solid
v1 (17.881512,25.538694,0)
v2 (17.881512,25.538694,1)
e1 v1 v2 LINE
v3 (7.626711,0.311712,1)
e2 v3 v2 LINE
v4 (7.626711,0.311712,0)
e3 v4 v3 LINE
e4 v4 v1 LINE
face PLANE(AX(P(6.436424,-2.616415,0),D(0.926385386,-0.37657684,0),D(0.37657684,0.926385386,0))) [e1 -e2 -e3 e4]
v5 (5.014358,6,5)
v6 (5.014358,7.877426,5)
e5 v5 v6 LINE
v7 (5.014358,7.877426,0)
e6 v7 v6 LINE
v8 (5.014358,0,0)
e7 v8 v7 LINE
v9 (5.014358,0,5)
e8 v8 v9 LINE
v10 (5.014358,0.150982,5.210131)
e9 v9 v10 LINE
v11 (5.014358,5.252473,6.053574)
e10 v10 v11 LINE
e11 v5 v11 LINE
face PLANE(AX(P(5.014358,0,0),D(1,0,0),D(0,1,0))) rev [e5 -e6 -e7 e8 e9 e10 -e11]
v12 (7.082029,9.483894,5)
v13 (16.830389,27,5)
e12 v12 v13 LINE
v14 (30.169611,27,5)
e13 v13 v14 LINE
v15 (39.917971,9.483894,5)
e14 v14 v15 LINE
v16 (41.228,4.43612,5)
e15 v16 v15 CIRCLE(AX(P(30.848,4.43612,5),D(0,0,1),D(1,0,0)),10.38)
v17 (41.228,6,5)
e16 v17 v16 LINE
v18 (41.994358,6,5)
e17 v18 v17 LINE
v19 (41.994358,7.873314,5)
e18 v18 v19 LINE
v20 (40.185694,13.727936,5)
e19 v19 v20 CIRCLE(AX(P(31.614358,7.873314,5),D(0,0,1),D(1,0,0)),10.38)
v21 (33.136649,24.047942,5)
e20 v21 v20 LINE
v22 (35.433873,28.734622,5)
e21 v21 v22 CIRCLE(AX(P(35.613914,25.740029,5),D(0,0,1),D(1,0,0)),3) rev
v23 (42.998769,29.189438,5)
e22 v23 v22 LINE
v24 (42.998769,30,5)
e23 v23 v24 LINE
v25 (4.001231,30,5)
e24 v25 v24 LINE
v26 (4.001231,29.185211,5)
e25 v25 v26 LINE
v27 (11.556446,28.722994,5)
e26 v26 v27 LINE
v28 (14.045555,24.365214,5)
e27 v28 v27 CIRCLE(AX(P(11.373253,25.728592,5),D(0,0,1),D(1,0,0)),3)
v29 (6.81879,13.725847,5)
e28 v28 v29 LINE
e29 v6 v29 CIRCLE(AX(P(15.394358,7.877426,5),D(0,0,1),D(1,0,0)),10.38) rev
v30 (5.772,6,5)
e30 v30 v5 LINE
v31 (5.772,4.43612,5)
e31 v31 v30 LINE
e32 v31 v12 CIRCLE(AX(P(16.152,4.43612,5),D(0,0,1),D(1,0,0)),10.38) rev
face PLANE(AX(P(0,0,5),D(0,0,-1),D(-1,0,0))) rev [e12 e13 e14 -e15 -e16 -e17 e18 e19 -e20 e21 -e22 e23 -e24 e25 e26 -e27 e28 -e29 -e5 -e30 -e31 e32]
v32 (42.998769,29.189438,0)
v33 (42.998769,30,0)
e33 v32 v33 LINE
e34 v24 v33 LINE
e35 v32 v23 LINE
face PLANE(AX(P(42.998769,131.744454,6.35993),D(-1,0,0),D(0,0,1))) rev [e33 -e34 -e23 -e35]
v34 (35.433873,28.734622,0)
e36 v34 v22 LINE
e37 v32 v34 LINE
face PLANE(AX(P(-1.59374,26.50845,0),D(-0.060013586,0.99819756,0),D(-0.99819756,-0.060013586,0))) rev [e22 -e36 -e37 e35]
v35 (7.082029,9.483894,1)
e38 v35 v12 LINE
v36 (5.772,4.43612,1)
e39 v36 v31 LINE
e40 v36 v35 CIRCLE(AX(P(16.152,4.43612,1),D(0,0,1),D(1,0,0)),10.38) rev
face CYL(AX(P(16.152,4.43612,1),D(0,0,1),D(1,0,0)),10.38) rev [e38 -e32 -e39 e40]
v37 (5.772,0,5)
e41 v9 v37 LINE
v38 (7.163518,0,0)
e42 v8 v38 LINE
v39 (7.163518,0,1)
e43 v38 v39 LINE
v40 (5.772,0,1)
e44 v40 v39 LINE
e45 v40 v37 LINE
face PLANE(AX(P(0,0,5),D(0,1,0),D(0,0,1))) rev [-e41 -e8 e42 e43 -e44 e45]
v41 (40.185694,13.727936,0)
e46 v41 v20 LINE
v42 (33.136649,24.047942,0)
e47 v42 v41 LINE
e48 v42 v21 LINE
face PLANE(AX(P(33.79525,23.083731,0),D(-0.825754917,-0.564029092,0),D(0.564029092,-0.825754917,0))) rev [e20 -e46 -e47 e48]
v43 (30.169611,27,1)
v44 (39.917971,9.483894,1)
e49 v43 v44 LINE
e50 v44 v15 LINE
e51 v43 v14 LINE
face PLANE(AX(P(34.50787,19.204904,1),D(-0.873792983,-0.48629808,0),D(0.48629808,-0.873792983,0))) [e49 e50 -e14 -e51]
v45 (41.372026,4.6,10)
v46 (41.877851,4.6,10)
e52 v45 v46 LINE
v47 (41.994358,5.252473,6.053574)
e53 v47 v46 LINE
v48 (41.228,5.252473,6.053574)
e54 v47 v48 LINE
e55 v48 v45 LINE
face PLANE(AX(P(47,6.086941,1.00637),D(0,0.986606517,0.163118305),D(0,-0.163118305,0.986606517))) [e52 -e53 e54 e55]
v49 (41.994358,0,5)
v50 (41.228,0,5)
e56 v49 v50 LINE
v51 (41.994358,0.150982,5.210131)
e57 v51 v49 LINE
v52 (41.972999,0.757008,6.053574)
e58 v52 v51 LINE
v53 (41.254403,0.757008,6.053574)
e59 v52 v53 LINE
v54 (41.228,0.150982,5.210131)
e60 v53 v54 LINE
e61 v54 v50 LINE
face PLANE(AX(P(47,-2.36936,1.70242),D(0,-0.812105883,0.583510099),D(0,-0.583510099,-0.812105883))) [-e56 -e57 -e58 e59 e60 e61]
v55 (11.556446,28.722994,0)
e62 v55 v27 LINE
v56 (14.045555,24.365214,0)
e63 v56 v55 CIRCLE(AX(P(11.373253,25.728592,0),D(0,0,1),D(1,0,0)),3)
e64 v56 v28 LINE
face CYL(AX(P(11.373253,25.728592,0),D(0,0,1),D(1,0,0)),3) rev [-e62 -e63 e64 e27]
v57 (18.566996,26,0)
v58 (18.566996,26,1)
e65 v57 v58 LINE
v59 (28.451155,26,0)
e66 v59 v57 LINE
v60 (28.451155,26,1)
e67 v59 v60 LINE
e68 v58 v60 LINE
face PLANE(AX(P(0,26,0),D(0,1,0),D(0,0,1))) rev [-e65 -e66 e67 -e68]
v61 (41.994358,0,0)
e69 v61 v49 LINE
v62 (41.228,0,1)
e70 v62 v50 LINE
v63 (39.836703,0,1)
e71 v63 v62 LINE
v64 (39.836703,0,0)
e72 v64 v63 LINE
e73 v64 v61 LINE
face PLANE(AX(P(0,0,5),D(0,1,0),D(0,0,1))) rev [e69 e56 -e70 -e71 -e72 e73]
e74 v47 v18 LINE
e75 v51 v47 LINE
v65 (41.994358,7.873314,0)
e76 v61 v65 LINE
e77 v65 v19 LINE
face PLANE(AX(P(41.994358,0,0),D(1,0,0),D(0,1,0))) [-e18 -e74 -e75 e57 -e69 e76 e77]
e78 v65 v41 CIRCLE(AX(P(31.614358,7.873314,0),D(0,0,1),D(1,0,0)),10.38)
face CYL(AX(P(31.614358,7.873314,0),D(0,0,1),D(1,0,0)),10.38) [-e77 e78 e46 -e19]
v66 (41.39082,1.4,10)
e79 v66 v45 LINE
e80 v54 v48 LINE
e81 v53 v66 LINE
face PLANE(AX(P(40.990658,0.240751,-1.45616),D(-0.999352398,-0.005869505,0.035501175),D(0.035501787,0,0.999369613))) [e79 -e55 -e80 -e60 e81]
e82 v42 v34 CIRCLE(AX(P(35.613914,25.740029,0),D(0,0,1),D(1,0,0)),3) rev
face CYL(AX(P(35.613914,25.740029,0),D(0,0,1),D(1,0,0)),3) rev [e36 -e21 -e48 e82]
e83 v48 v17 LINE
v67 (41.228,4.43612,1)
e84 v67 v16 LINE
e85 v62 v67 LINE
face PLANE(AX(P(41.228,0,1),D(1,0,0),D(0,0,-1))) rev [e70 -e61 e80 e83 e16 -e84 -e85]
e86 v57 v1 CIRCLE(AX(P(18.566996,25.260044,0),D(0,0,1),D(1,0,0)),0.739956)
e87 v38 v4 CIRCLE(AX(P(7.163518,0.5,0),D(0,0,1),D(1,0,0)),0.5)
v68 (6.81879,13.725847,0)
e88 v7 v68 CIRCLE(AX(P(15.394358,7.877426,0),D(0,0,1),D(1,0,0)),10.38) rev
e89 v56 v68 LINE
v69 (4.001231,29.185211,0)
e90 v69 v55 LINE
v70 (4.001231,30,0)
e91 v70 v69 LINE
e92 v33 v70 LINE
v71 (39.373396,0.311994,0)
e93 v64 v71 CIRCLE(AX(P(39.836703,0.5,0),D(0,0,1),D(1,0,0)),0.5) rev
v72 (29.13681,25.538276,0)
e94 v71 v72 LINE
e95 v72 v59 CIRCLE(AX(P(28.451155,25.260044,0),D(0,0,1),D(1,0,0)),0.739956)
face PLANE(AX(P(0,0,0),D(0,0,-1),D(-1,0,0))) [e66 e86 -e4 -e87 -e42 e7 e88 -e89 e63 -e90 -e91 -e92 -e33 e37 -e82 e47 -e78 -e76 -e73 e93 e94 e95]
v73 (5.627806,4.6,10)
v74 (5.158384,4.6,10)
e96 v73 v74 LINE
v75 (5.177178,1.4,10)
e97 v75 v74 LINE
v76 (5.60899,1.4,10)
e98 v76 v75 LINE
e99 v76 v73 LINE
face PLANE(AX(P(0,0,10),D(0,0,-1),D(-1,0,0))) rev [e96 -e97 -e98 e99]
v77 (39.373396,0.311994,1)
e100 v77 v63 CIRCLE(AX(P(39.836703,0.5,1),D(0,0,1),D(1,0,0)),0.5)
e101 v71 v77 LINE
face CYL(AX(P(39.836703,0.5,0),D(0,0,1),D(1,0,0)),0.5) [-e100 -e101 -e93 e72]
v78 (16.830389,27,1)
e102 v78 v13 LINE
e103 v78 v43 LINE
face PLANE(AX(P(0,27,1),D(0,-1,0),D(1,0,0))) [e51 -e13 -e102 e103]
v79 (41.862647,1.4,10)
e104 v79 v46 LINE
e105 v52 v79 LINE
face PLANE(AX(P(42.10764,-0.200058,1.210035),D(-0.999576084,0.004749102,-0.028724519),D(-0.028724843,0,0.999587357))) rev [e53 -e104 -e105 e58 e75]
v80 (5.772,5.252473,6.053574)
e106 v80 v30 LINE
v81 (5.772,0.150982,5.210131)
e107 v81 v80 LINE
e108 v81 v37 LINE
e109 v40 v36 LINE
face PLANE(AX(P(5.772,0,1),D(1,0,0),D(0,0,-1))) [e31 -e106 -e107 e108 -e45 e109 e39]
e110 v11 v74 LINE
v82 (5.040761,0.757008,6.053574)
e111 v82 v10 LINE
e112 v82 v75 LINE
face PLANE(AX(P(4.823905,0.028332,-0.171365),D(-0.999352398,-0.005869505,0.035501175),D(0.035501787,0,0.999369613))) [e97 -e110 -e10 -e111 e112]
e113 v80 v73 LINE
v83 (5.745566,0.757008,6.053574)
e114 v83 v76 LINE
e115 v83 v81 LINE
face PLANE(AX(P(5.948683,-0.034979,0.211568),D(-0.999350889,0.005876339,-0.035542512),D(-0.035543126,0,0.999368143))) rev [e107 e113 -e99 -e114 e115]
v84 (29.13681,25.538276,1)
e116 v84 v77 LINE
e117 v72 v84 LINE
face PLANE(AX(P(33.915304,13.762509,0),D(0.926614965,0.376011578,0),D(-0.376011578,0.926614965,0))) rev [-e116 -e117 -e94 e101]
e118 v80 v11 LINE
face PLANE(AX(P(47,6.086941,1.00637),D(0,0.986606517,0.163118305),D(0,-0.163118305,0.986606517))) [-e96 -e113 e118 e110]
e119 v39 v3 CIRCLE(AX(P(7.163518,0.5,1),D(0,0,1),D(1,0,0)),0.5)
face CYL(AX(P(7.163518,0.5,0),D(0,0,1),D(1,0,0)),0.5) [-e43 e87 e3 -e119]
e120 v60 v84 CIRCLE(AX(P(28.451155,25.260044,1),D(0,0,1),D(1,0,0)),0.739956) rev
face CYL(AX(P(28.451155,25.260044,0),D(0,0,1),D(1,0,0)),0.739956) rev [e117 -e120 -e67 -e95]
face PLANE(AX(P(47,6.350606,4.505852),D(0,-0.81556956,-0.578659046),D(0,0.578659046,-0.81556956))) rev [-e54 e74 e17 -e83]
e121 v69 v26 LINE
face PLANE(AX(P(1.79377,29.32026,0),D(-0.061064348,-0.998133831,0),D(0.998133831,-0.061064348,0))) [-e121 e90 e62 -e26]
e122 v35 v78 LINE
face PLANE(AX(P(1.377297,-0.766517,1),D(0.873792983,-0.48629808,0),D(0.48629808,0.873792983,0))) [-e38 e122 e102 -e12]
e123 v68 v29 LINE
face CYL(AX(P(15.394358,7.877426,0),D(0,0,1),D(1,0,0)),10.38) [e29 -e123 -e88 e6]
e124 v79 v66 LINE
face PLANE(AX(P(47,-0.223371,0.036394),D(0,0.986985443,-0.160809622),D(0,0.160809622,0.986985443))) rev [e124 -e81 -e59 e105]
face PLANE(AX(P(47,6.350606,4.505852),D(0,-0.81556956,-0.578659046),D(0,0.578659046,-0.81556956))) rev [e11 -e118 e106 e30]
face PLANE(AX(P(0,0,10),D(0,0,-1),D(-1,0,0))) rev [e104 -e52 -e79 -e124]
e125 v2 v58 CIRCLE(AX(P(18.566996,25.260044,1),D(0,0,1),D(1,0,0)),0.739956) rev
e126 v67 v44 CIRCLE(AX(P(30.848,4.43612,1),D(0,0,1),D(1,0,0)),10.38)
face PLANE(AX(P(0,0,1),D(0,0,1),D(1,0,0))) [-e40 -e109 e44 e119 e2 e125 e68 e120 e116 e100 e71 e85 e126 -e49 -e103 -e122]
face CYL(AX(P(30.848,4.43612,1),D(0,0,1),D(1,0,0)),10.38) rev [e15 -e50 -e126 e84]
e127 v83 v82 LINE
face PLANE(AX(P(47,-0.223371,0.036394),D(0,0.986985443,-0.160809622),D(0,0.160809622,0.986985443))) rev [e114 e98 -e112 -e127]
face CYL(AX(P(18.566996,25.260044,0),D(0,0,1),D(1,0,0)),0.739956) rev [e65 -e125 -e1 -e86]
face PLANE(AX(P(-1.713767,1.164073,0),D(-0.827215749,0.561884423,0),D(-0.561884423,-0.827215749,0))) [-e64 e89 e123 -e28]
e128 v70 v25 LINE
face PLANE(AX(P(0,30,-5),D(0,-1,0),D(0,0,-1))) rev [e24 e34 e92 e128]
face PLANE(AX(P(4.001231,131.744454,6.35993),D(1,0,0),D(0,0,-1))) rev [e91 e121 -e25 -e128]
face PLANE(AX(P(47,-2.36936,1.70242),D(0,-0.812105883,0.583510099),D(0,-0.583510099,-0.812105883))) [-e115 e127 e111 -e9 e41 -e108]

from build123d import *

# Parameters (mm, degrees)
SKETCH_1_W               = 47
SKETCH_1_H               = 32
EXTRUDE_1_DEPTH          = 5
CUT_EXTRUDE_1_DEPTH      = 58.078892771
CUT_EXTRUDE_5_DEPTH      = 4
CUT_EXTRUDE_6_DEPTH      = 58.078892771
SKETCH_5_W               = 0.757642216
SKETCH_5_H               = 6
SKETCH_5_W_2             = 0.766357784
EXTRUDE_2_DEPTH          = 5
CUT_EXTRUDE_7_DEPTH      = 54.728894948
CUT_EXTRUDE_8_DEPTH      = 55.418489547
SKETCH_8_W               = 47
SKETCH_8_H               = 2
CUT_EXTRUDE_9_DEPTH      = 10
CUT_EXTRUDE_START        = -0.814789408
CUT_EXTRUDE_10_OUTLINE_W = 4.001231447
CUT_EXTRUDE_10_OUTLINE_H = 5
CUT_EXTRUDE_10_DEPTH     = 0.814789408


# Read off the part's stored shape, not the designer's step: 切除-拉伸10
with BuildPart() as part:
    # 草图1 → 凸台-拉伸1 (new body)
    with BuildSketch(Plane.XY):
        with Locations((23.5, 16)):
            Rectangle(SKETCH_1_W, SKETCH_1_H)
    extrude(amount=EXTRUDE_1_DEPTH)

    # 草图2 → 切除-拉伸1 (cut, through all)
    with BuildSketch(Plane.XY.offset(5)):
        with BuildLine():
            Line((23.5, 0), (23.5, 26))
            Line((23.5, 26), (18.566996488, 26))
            ThreePointArc((18.566996488, 26), (18.15387041, 25.873934732), (17.881511675, 25.538694031))
            Line((17.881511675, 25.538694031), (7.626711155, 0.31171158))
            ThreePointArc((7.626711155, 0.31171158), (7.442674144, 0.085184252), (7.163518462, 0))
            Line((7.163518462, 0), (7.5, 0))
            Line((7.5, 0), (23.5, 0))
        make_face()
        with BuildLine():
            Line((28.45115486, 26), (23.5, 26))
            Line((23.5, 26), (23.5, 0))
            Line((23.5, 0), (39.5, 0))
            Line((39.5, 0), (39.836703186, 0))
            ThreePointArc((39.836703186, 0), (39.557420976, 0.085269428), (39.373395704, 0.311994211))
            Line((39.373395704, 0.311994211), (29.136809551, 25.538275761))
            ThreePointArc((29.136809551, 25.538275761), (28.864468188, 25.873808678), (28.45115486, 26))
        make_face()
    extrude(amount=-CUT_EXTRUDE_1_DEPTH, mode=Mode.SUBTRACT)

    # 草图3 → 切除-拉伸5 (cut)
    with BuildSketch(Plane.XY.offset(5)):
        with BuildLine():
            Line((28.45115486, 26), (18.566996488, 26))
            add(Edge.make_bspline(
                [(18.566996488, 26), (18.083486738, 25.978522449), (17.881511675, 25.538694031)],
                knots=[0, 0, 0, 1, 1, 1], degree=2))
            Line((17.881511675, 25.538694031), (7.614040039, 0.280540422))
            ThreePointArc((7.614040039, 0.280540422), (7.448406729, 0.076665827), (7.197166615, 0))
            Line((7.197166615, 0), (5.772, 0))
            Line((5.772, 0), (5.772, 4.436119664))
            ThreePointArc((5.772, 4.436119664), (6.104843669, 7.043618399), (7.082028835, 9.483893735))
            Line((7.082028835, 9.483893735), (16.830389156, 27))
            Line((16.830389156, 27), (30.169610844, 27))
            Line((30.169610844, 27), (39.917971165, 9.483893735))
            ThreePointArc((39.917971165, 9.483893735), (40.895156331, 7.043618399), (41.228, 4.436119664))
            Line((41.228, 4.436119664), (41.228, 0))
            Line((41.228, 0), (39.803032868, 0))
            ThreePointArc((39.803032868, 0), (39.551678879, 0.076742485), (39.386056133, 0.28079479))
            Line((39.386056133, 0.28079479), (29.136809551, 25.538275761))
            add(Edge.make_bspline(
                [(28.45115486, 26), (28.93495417, 25.978479476), (29.136809551, 25.538275761)],
                knots=[0, 0, 0, 1, 1, 1], degree=2))
        make_face()
    extrude(amount=-CUT_EXTRUDE_5_DEPTH, mode=Mode.SUBTRACT)

    # 草图4 → 切除-拉伸6 (cut, through all)
    with BuildSketch(Plane.XY.offset(5)):
        with BuildLine():
            Line((0, 0), (5.014357784, 0))
            Line((5.014357784, 0), (5.014357784, 7.877425761))
            ThreePointArc((5.014357784, 7.877425761), (5.475718856, 10.937654809), (6.818789734, 13.72584714))
            Line((6.818789734, 13.72584714), (14.045555305, 24.365213617))
            ThreePointArc((14.045555305, 24.365213617), (13.978253194, 27.216535436), (11.556446219, 28.722993754))
            Line((11.556446219, 28.722993754), (0, 29.43))
            Line((0, 29.43), (0, 0))
        make_face()
        with BuildLine():
            Line((41.994357784, 7.873314412), (41.994357784, 0))
            Line((41.994357784, 0), (47, 0))
            Line((47, 0), (47, 29.43))
            Line((47, 29.43), (35.433873083, 28.73462187))
            ThreePointArc((35.433873083, 28.73462187), (32.920113477, 27.060422918), (33.13664909, 24.047941912))
            Line((33.13664909, 24.047941912), (40.185693822, 13.727936391))
            ThreePointArc((40.185693822, 13.727936391), (41.531889434, 10.937130001), (41.994357784, 7.873314412))
        make_face()
    extrude(amount=-CUT_EXTRUDE_6_DEPTH, mode=Mode.SUBTRACT)

    # 草图5 → 凸台-拉伸2 (add)
    with BuildSketch(Plane.XY.offset(5)):
        with Locations((5.393178892, 3)):
            Rectangle(SKETCH_5_W, SKETCH_5_H)
        with Locations((41.611178892, 3)):
            Rectangle(SKETCH_5_W_2, SKETCH_5_H)
    extrude(amount=EXTRUDE_2_DEPTH)

    # 草图6 → 切除-拉伸7 (cut, through all)
    with BuildSketch(Plane.ZY.offset(-5.014357784)):
        Polygon((6.053573934, 5.25247322), (10, 4.6), (10, 6), (5, 6), align=None)
        Polygon((10, 0), (10, 1.4), (6.053573934, 0.757008468), (5, 0), align=None)
    extrude(amount=-CUT_EXTRUDE_7_DEPTH, mode=Mode.SUBTRACT)

    # 草图7 → 切除-拉伸8 (cut, through all)
    with BuildSketch(Plane(origin=(0, 6.086940952, 1.006370294), x_dir=(1, 0, 0), z_dir=(0, 0.9866065166041178, 0.16311830490257262))):
        Polygon((5.1771781, -9.637699539), (5.158383514, -9.115720963), (5.014357784, -9.115720963), (5.014357784, -9.637699539), align=None)
        Polygon((5.158383514, -9.115720963), (5.014357784, -5.115720963), (5.014357784, -9.115720963), align=None)
        Polygon((5.772, -9.115720963), (5.772, -5.115720963), (5.627806352, -9.115720963), align=None)
        Polygon((5.772, -9.115720963), (5.627806352, -9.115720963), (5.608989853, -9.637699539), (5.772, -9.637699539), align=None)
        Polygon((41.994357784, -9.637699539), (41.994357784, -5.115720963), (41.862646969, -9.637699539), align=None)
        Polygon((41.390820316, -9.637699539), (41.228, -5.115720963), (41.228, -9.637699539), align=None)
    extrude(amount=-CUT_EXTRUDE_8_DEPTH, mode=Mode.SUBTRACT)

    # 草图8 → 切除-拉伸9 (cut)
    with BuildSketch(Plane.XY.offset(5)):
        with Locations((23.5, 31)):
            Rectangle(SKETCH_8_W, SKETCH_8_H)
    extrude(amount=-CUT_EXTRUDE_9_DEPTH, mode=Mode.SUBTRACT)

    # 切除-拉伸10 outline → 切除-拉伸10 (cut)
    with BuildSketch(Plane(origin=(0, 30, 0), x_dir=(1, 0, 0), z_dir=(0, 1, 0)).offset(CUT_EXTRUDE_START)):
        with Locations((2.000615724, -2.5)):
            Rectangle(CUT_EXTRUDE_10_OUTLINE_W, CUT_EXTRUDE_10_OUTLINE_H)
        with Locations((44.999384277, -2.5)):
            Rectangle(CUT_EXTRUDE_10_OUTLINE_W, CUT_EXTRUDE_10_OUTLINE_H)
    extrude(amount=CUT_EXTRUDE_10_DEPTH, mode=Mode.SUBTRACT)


solid = part.part
